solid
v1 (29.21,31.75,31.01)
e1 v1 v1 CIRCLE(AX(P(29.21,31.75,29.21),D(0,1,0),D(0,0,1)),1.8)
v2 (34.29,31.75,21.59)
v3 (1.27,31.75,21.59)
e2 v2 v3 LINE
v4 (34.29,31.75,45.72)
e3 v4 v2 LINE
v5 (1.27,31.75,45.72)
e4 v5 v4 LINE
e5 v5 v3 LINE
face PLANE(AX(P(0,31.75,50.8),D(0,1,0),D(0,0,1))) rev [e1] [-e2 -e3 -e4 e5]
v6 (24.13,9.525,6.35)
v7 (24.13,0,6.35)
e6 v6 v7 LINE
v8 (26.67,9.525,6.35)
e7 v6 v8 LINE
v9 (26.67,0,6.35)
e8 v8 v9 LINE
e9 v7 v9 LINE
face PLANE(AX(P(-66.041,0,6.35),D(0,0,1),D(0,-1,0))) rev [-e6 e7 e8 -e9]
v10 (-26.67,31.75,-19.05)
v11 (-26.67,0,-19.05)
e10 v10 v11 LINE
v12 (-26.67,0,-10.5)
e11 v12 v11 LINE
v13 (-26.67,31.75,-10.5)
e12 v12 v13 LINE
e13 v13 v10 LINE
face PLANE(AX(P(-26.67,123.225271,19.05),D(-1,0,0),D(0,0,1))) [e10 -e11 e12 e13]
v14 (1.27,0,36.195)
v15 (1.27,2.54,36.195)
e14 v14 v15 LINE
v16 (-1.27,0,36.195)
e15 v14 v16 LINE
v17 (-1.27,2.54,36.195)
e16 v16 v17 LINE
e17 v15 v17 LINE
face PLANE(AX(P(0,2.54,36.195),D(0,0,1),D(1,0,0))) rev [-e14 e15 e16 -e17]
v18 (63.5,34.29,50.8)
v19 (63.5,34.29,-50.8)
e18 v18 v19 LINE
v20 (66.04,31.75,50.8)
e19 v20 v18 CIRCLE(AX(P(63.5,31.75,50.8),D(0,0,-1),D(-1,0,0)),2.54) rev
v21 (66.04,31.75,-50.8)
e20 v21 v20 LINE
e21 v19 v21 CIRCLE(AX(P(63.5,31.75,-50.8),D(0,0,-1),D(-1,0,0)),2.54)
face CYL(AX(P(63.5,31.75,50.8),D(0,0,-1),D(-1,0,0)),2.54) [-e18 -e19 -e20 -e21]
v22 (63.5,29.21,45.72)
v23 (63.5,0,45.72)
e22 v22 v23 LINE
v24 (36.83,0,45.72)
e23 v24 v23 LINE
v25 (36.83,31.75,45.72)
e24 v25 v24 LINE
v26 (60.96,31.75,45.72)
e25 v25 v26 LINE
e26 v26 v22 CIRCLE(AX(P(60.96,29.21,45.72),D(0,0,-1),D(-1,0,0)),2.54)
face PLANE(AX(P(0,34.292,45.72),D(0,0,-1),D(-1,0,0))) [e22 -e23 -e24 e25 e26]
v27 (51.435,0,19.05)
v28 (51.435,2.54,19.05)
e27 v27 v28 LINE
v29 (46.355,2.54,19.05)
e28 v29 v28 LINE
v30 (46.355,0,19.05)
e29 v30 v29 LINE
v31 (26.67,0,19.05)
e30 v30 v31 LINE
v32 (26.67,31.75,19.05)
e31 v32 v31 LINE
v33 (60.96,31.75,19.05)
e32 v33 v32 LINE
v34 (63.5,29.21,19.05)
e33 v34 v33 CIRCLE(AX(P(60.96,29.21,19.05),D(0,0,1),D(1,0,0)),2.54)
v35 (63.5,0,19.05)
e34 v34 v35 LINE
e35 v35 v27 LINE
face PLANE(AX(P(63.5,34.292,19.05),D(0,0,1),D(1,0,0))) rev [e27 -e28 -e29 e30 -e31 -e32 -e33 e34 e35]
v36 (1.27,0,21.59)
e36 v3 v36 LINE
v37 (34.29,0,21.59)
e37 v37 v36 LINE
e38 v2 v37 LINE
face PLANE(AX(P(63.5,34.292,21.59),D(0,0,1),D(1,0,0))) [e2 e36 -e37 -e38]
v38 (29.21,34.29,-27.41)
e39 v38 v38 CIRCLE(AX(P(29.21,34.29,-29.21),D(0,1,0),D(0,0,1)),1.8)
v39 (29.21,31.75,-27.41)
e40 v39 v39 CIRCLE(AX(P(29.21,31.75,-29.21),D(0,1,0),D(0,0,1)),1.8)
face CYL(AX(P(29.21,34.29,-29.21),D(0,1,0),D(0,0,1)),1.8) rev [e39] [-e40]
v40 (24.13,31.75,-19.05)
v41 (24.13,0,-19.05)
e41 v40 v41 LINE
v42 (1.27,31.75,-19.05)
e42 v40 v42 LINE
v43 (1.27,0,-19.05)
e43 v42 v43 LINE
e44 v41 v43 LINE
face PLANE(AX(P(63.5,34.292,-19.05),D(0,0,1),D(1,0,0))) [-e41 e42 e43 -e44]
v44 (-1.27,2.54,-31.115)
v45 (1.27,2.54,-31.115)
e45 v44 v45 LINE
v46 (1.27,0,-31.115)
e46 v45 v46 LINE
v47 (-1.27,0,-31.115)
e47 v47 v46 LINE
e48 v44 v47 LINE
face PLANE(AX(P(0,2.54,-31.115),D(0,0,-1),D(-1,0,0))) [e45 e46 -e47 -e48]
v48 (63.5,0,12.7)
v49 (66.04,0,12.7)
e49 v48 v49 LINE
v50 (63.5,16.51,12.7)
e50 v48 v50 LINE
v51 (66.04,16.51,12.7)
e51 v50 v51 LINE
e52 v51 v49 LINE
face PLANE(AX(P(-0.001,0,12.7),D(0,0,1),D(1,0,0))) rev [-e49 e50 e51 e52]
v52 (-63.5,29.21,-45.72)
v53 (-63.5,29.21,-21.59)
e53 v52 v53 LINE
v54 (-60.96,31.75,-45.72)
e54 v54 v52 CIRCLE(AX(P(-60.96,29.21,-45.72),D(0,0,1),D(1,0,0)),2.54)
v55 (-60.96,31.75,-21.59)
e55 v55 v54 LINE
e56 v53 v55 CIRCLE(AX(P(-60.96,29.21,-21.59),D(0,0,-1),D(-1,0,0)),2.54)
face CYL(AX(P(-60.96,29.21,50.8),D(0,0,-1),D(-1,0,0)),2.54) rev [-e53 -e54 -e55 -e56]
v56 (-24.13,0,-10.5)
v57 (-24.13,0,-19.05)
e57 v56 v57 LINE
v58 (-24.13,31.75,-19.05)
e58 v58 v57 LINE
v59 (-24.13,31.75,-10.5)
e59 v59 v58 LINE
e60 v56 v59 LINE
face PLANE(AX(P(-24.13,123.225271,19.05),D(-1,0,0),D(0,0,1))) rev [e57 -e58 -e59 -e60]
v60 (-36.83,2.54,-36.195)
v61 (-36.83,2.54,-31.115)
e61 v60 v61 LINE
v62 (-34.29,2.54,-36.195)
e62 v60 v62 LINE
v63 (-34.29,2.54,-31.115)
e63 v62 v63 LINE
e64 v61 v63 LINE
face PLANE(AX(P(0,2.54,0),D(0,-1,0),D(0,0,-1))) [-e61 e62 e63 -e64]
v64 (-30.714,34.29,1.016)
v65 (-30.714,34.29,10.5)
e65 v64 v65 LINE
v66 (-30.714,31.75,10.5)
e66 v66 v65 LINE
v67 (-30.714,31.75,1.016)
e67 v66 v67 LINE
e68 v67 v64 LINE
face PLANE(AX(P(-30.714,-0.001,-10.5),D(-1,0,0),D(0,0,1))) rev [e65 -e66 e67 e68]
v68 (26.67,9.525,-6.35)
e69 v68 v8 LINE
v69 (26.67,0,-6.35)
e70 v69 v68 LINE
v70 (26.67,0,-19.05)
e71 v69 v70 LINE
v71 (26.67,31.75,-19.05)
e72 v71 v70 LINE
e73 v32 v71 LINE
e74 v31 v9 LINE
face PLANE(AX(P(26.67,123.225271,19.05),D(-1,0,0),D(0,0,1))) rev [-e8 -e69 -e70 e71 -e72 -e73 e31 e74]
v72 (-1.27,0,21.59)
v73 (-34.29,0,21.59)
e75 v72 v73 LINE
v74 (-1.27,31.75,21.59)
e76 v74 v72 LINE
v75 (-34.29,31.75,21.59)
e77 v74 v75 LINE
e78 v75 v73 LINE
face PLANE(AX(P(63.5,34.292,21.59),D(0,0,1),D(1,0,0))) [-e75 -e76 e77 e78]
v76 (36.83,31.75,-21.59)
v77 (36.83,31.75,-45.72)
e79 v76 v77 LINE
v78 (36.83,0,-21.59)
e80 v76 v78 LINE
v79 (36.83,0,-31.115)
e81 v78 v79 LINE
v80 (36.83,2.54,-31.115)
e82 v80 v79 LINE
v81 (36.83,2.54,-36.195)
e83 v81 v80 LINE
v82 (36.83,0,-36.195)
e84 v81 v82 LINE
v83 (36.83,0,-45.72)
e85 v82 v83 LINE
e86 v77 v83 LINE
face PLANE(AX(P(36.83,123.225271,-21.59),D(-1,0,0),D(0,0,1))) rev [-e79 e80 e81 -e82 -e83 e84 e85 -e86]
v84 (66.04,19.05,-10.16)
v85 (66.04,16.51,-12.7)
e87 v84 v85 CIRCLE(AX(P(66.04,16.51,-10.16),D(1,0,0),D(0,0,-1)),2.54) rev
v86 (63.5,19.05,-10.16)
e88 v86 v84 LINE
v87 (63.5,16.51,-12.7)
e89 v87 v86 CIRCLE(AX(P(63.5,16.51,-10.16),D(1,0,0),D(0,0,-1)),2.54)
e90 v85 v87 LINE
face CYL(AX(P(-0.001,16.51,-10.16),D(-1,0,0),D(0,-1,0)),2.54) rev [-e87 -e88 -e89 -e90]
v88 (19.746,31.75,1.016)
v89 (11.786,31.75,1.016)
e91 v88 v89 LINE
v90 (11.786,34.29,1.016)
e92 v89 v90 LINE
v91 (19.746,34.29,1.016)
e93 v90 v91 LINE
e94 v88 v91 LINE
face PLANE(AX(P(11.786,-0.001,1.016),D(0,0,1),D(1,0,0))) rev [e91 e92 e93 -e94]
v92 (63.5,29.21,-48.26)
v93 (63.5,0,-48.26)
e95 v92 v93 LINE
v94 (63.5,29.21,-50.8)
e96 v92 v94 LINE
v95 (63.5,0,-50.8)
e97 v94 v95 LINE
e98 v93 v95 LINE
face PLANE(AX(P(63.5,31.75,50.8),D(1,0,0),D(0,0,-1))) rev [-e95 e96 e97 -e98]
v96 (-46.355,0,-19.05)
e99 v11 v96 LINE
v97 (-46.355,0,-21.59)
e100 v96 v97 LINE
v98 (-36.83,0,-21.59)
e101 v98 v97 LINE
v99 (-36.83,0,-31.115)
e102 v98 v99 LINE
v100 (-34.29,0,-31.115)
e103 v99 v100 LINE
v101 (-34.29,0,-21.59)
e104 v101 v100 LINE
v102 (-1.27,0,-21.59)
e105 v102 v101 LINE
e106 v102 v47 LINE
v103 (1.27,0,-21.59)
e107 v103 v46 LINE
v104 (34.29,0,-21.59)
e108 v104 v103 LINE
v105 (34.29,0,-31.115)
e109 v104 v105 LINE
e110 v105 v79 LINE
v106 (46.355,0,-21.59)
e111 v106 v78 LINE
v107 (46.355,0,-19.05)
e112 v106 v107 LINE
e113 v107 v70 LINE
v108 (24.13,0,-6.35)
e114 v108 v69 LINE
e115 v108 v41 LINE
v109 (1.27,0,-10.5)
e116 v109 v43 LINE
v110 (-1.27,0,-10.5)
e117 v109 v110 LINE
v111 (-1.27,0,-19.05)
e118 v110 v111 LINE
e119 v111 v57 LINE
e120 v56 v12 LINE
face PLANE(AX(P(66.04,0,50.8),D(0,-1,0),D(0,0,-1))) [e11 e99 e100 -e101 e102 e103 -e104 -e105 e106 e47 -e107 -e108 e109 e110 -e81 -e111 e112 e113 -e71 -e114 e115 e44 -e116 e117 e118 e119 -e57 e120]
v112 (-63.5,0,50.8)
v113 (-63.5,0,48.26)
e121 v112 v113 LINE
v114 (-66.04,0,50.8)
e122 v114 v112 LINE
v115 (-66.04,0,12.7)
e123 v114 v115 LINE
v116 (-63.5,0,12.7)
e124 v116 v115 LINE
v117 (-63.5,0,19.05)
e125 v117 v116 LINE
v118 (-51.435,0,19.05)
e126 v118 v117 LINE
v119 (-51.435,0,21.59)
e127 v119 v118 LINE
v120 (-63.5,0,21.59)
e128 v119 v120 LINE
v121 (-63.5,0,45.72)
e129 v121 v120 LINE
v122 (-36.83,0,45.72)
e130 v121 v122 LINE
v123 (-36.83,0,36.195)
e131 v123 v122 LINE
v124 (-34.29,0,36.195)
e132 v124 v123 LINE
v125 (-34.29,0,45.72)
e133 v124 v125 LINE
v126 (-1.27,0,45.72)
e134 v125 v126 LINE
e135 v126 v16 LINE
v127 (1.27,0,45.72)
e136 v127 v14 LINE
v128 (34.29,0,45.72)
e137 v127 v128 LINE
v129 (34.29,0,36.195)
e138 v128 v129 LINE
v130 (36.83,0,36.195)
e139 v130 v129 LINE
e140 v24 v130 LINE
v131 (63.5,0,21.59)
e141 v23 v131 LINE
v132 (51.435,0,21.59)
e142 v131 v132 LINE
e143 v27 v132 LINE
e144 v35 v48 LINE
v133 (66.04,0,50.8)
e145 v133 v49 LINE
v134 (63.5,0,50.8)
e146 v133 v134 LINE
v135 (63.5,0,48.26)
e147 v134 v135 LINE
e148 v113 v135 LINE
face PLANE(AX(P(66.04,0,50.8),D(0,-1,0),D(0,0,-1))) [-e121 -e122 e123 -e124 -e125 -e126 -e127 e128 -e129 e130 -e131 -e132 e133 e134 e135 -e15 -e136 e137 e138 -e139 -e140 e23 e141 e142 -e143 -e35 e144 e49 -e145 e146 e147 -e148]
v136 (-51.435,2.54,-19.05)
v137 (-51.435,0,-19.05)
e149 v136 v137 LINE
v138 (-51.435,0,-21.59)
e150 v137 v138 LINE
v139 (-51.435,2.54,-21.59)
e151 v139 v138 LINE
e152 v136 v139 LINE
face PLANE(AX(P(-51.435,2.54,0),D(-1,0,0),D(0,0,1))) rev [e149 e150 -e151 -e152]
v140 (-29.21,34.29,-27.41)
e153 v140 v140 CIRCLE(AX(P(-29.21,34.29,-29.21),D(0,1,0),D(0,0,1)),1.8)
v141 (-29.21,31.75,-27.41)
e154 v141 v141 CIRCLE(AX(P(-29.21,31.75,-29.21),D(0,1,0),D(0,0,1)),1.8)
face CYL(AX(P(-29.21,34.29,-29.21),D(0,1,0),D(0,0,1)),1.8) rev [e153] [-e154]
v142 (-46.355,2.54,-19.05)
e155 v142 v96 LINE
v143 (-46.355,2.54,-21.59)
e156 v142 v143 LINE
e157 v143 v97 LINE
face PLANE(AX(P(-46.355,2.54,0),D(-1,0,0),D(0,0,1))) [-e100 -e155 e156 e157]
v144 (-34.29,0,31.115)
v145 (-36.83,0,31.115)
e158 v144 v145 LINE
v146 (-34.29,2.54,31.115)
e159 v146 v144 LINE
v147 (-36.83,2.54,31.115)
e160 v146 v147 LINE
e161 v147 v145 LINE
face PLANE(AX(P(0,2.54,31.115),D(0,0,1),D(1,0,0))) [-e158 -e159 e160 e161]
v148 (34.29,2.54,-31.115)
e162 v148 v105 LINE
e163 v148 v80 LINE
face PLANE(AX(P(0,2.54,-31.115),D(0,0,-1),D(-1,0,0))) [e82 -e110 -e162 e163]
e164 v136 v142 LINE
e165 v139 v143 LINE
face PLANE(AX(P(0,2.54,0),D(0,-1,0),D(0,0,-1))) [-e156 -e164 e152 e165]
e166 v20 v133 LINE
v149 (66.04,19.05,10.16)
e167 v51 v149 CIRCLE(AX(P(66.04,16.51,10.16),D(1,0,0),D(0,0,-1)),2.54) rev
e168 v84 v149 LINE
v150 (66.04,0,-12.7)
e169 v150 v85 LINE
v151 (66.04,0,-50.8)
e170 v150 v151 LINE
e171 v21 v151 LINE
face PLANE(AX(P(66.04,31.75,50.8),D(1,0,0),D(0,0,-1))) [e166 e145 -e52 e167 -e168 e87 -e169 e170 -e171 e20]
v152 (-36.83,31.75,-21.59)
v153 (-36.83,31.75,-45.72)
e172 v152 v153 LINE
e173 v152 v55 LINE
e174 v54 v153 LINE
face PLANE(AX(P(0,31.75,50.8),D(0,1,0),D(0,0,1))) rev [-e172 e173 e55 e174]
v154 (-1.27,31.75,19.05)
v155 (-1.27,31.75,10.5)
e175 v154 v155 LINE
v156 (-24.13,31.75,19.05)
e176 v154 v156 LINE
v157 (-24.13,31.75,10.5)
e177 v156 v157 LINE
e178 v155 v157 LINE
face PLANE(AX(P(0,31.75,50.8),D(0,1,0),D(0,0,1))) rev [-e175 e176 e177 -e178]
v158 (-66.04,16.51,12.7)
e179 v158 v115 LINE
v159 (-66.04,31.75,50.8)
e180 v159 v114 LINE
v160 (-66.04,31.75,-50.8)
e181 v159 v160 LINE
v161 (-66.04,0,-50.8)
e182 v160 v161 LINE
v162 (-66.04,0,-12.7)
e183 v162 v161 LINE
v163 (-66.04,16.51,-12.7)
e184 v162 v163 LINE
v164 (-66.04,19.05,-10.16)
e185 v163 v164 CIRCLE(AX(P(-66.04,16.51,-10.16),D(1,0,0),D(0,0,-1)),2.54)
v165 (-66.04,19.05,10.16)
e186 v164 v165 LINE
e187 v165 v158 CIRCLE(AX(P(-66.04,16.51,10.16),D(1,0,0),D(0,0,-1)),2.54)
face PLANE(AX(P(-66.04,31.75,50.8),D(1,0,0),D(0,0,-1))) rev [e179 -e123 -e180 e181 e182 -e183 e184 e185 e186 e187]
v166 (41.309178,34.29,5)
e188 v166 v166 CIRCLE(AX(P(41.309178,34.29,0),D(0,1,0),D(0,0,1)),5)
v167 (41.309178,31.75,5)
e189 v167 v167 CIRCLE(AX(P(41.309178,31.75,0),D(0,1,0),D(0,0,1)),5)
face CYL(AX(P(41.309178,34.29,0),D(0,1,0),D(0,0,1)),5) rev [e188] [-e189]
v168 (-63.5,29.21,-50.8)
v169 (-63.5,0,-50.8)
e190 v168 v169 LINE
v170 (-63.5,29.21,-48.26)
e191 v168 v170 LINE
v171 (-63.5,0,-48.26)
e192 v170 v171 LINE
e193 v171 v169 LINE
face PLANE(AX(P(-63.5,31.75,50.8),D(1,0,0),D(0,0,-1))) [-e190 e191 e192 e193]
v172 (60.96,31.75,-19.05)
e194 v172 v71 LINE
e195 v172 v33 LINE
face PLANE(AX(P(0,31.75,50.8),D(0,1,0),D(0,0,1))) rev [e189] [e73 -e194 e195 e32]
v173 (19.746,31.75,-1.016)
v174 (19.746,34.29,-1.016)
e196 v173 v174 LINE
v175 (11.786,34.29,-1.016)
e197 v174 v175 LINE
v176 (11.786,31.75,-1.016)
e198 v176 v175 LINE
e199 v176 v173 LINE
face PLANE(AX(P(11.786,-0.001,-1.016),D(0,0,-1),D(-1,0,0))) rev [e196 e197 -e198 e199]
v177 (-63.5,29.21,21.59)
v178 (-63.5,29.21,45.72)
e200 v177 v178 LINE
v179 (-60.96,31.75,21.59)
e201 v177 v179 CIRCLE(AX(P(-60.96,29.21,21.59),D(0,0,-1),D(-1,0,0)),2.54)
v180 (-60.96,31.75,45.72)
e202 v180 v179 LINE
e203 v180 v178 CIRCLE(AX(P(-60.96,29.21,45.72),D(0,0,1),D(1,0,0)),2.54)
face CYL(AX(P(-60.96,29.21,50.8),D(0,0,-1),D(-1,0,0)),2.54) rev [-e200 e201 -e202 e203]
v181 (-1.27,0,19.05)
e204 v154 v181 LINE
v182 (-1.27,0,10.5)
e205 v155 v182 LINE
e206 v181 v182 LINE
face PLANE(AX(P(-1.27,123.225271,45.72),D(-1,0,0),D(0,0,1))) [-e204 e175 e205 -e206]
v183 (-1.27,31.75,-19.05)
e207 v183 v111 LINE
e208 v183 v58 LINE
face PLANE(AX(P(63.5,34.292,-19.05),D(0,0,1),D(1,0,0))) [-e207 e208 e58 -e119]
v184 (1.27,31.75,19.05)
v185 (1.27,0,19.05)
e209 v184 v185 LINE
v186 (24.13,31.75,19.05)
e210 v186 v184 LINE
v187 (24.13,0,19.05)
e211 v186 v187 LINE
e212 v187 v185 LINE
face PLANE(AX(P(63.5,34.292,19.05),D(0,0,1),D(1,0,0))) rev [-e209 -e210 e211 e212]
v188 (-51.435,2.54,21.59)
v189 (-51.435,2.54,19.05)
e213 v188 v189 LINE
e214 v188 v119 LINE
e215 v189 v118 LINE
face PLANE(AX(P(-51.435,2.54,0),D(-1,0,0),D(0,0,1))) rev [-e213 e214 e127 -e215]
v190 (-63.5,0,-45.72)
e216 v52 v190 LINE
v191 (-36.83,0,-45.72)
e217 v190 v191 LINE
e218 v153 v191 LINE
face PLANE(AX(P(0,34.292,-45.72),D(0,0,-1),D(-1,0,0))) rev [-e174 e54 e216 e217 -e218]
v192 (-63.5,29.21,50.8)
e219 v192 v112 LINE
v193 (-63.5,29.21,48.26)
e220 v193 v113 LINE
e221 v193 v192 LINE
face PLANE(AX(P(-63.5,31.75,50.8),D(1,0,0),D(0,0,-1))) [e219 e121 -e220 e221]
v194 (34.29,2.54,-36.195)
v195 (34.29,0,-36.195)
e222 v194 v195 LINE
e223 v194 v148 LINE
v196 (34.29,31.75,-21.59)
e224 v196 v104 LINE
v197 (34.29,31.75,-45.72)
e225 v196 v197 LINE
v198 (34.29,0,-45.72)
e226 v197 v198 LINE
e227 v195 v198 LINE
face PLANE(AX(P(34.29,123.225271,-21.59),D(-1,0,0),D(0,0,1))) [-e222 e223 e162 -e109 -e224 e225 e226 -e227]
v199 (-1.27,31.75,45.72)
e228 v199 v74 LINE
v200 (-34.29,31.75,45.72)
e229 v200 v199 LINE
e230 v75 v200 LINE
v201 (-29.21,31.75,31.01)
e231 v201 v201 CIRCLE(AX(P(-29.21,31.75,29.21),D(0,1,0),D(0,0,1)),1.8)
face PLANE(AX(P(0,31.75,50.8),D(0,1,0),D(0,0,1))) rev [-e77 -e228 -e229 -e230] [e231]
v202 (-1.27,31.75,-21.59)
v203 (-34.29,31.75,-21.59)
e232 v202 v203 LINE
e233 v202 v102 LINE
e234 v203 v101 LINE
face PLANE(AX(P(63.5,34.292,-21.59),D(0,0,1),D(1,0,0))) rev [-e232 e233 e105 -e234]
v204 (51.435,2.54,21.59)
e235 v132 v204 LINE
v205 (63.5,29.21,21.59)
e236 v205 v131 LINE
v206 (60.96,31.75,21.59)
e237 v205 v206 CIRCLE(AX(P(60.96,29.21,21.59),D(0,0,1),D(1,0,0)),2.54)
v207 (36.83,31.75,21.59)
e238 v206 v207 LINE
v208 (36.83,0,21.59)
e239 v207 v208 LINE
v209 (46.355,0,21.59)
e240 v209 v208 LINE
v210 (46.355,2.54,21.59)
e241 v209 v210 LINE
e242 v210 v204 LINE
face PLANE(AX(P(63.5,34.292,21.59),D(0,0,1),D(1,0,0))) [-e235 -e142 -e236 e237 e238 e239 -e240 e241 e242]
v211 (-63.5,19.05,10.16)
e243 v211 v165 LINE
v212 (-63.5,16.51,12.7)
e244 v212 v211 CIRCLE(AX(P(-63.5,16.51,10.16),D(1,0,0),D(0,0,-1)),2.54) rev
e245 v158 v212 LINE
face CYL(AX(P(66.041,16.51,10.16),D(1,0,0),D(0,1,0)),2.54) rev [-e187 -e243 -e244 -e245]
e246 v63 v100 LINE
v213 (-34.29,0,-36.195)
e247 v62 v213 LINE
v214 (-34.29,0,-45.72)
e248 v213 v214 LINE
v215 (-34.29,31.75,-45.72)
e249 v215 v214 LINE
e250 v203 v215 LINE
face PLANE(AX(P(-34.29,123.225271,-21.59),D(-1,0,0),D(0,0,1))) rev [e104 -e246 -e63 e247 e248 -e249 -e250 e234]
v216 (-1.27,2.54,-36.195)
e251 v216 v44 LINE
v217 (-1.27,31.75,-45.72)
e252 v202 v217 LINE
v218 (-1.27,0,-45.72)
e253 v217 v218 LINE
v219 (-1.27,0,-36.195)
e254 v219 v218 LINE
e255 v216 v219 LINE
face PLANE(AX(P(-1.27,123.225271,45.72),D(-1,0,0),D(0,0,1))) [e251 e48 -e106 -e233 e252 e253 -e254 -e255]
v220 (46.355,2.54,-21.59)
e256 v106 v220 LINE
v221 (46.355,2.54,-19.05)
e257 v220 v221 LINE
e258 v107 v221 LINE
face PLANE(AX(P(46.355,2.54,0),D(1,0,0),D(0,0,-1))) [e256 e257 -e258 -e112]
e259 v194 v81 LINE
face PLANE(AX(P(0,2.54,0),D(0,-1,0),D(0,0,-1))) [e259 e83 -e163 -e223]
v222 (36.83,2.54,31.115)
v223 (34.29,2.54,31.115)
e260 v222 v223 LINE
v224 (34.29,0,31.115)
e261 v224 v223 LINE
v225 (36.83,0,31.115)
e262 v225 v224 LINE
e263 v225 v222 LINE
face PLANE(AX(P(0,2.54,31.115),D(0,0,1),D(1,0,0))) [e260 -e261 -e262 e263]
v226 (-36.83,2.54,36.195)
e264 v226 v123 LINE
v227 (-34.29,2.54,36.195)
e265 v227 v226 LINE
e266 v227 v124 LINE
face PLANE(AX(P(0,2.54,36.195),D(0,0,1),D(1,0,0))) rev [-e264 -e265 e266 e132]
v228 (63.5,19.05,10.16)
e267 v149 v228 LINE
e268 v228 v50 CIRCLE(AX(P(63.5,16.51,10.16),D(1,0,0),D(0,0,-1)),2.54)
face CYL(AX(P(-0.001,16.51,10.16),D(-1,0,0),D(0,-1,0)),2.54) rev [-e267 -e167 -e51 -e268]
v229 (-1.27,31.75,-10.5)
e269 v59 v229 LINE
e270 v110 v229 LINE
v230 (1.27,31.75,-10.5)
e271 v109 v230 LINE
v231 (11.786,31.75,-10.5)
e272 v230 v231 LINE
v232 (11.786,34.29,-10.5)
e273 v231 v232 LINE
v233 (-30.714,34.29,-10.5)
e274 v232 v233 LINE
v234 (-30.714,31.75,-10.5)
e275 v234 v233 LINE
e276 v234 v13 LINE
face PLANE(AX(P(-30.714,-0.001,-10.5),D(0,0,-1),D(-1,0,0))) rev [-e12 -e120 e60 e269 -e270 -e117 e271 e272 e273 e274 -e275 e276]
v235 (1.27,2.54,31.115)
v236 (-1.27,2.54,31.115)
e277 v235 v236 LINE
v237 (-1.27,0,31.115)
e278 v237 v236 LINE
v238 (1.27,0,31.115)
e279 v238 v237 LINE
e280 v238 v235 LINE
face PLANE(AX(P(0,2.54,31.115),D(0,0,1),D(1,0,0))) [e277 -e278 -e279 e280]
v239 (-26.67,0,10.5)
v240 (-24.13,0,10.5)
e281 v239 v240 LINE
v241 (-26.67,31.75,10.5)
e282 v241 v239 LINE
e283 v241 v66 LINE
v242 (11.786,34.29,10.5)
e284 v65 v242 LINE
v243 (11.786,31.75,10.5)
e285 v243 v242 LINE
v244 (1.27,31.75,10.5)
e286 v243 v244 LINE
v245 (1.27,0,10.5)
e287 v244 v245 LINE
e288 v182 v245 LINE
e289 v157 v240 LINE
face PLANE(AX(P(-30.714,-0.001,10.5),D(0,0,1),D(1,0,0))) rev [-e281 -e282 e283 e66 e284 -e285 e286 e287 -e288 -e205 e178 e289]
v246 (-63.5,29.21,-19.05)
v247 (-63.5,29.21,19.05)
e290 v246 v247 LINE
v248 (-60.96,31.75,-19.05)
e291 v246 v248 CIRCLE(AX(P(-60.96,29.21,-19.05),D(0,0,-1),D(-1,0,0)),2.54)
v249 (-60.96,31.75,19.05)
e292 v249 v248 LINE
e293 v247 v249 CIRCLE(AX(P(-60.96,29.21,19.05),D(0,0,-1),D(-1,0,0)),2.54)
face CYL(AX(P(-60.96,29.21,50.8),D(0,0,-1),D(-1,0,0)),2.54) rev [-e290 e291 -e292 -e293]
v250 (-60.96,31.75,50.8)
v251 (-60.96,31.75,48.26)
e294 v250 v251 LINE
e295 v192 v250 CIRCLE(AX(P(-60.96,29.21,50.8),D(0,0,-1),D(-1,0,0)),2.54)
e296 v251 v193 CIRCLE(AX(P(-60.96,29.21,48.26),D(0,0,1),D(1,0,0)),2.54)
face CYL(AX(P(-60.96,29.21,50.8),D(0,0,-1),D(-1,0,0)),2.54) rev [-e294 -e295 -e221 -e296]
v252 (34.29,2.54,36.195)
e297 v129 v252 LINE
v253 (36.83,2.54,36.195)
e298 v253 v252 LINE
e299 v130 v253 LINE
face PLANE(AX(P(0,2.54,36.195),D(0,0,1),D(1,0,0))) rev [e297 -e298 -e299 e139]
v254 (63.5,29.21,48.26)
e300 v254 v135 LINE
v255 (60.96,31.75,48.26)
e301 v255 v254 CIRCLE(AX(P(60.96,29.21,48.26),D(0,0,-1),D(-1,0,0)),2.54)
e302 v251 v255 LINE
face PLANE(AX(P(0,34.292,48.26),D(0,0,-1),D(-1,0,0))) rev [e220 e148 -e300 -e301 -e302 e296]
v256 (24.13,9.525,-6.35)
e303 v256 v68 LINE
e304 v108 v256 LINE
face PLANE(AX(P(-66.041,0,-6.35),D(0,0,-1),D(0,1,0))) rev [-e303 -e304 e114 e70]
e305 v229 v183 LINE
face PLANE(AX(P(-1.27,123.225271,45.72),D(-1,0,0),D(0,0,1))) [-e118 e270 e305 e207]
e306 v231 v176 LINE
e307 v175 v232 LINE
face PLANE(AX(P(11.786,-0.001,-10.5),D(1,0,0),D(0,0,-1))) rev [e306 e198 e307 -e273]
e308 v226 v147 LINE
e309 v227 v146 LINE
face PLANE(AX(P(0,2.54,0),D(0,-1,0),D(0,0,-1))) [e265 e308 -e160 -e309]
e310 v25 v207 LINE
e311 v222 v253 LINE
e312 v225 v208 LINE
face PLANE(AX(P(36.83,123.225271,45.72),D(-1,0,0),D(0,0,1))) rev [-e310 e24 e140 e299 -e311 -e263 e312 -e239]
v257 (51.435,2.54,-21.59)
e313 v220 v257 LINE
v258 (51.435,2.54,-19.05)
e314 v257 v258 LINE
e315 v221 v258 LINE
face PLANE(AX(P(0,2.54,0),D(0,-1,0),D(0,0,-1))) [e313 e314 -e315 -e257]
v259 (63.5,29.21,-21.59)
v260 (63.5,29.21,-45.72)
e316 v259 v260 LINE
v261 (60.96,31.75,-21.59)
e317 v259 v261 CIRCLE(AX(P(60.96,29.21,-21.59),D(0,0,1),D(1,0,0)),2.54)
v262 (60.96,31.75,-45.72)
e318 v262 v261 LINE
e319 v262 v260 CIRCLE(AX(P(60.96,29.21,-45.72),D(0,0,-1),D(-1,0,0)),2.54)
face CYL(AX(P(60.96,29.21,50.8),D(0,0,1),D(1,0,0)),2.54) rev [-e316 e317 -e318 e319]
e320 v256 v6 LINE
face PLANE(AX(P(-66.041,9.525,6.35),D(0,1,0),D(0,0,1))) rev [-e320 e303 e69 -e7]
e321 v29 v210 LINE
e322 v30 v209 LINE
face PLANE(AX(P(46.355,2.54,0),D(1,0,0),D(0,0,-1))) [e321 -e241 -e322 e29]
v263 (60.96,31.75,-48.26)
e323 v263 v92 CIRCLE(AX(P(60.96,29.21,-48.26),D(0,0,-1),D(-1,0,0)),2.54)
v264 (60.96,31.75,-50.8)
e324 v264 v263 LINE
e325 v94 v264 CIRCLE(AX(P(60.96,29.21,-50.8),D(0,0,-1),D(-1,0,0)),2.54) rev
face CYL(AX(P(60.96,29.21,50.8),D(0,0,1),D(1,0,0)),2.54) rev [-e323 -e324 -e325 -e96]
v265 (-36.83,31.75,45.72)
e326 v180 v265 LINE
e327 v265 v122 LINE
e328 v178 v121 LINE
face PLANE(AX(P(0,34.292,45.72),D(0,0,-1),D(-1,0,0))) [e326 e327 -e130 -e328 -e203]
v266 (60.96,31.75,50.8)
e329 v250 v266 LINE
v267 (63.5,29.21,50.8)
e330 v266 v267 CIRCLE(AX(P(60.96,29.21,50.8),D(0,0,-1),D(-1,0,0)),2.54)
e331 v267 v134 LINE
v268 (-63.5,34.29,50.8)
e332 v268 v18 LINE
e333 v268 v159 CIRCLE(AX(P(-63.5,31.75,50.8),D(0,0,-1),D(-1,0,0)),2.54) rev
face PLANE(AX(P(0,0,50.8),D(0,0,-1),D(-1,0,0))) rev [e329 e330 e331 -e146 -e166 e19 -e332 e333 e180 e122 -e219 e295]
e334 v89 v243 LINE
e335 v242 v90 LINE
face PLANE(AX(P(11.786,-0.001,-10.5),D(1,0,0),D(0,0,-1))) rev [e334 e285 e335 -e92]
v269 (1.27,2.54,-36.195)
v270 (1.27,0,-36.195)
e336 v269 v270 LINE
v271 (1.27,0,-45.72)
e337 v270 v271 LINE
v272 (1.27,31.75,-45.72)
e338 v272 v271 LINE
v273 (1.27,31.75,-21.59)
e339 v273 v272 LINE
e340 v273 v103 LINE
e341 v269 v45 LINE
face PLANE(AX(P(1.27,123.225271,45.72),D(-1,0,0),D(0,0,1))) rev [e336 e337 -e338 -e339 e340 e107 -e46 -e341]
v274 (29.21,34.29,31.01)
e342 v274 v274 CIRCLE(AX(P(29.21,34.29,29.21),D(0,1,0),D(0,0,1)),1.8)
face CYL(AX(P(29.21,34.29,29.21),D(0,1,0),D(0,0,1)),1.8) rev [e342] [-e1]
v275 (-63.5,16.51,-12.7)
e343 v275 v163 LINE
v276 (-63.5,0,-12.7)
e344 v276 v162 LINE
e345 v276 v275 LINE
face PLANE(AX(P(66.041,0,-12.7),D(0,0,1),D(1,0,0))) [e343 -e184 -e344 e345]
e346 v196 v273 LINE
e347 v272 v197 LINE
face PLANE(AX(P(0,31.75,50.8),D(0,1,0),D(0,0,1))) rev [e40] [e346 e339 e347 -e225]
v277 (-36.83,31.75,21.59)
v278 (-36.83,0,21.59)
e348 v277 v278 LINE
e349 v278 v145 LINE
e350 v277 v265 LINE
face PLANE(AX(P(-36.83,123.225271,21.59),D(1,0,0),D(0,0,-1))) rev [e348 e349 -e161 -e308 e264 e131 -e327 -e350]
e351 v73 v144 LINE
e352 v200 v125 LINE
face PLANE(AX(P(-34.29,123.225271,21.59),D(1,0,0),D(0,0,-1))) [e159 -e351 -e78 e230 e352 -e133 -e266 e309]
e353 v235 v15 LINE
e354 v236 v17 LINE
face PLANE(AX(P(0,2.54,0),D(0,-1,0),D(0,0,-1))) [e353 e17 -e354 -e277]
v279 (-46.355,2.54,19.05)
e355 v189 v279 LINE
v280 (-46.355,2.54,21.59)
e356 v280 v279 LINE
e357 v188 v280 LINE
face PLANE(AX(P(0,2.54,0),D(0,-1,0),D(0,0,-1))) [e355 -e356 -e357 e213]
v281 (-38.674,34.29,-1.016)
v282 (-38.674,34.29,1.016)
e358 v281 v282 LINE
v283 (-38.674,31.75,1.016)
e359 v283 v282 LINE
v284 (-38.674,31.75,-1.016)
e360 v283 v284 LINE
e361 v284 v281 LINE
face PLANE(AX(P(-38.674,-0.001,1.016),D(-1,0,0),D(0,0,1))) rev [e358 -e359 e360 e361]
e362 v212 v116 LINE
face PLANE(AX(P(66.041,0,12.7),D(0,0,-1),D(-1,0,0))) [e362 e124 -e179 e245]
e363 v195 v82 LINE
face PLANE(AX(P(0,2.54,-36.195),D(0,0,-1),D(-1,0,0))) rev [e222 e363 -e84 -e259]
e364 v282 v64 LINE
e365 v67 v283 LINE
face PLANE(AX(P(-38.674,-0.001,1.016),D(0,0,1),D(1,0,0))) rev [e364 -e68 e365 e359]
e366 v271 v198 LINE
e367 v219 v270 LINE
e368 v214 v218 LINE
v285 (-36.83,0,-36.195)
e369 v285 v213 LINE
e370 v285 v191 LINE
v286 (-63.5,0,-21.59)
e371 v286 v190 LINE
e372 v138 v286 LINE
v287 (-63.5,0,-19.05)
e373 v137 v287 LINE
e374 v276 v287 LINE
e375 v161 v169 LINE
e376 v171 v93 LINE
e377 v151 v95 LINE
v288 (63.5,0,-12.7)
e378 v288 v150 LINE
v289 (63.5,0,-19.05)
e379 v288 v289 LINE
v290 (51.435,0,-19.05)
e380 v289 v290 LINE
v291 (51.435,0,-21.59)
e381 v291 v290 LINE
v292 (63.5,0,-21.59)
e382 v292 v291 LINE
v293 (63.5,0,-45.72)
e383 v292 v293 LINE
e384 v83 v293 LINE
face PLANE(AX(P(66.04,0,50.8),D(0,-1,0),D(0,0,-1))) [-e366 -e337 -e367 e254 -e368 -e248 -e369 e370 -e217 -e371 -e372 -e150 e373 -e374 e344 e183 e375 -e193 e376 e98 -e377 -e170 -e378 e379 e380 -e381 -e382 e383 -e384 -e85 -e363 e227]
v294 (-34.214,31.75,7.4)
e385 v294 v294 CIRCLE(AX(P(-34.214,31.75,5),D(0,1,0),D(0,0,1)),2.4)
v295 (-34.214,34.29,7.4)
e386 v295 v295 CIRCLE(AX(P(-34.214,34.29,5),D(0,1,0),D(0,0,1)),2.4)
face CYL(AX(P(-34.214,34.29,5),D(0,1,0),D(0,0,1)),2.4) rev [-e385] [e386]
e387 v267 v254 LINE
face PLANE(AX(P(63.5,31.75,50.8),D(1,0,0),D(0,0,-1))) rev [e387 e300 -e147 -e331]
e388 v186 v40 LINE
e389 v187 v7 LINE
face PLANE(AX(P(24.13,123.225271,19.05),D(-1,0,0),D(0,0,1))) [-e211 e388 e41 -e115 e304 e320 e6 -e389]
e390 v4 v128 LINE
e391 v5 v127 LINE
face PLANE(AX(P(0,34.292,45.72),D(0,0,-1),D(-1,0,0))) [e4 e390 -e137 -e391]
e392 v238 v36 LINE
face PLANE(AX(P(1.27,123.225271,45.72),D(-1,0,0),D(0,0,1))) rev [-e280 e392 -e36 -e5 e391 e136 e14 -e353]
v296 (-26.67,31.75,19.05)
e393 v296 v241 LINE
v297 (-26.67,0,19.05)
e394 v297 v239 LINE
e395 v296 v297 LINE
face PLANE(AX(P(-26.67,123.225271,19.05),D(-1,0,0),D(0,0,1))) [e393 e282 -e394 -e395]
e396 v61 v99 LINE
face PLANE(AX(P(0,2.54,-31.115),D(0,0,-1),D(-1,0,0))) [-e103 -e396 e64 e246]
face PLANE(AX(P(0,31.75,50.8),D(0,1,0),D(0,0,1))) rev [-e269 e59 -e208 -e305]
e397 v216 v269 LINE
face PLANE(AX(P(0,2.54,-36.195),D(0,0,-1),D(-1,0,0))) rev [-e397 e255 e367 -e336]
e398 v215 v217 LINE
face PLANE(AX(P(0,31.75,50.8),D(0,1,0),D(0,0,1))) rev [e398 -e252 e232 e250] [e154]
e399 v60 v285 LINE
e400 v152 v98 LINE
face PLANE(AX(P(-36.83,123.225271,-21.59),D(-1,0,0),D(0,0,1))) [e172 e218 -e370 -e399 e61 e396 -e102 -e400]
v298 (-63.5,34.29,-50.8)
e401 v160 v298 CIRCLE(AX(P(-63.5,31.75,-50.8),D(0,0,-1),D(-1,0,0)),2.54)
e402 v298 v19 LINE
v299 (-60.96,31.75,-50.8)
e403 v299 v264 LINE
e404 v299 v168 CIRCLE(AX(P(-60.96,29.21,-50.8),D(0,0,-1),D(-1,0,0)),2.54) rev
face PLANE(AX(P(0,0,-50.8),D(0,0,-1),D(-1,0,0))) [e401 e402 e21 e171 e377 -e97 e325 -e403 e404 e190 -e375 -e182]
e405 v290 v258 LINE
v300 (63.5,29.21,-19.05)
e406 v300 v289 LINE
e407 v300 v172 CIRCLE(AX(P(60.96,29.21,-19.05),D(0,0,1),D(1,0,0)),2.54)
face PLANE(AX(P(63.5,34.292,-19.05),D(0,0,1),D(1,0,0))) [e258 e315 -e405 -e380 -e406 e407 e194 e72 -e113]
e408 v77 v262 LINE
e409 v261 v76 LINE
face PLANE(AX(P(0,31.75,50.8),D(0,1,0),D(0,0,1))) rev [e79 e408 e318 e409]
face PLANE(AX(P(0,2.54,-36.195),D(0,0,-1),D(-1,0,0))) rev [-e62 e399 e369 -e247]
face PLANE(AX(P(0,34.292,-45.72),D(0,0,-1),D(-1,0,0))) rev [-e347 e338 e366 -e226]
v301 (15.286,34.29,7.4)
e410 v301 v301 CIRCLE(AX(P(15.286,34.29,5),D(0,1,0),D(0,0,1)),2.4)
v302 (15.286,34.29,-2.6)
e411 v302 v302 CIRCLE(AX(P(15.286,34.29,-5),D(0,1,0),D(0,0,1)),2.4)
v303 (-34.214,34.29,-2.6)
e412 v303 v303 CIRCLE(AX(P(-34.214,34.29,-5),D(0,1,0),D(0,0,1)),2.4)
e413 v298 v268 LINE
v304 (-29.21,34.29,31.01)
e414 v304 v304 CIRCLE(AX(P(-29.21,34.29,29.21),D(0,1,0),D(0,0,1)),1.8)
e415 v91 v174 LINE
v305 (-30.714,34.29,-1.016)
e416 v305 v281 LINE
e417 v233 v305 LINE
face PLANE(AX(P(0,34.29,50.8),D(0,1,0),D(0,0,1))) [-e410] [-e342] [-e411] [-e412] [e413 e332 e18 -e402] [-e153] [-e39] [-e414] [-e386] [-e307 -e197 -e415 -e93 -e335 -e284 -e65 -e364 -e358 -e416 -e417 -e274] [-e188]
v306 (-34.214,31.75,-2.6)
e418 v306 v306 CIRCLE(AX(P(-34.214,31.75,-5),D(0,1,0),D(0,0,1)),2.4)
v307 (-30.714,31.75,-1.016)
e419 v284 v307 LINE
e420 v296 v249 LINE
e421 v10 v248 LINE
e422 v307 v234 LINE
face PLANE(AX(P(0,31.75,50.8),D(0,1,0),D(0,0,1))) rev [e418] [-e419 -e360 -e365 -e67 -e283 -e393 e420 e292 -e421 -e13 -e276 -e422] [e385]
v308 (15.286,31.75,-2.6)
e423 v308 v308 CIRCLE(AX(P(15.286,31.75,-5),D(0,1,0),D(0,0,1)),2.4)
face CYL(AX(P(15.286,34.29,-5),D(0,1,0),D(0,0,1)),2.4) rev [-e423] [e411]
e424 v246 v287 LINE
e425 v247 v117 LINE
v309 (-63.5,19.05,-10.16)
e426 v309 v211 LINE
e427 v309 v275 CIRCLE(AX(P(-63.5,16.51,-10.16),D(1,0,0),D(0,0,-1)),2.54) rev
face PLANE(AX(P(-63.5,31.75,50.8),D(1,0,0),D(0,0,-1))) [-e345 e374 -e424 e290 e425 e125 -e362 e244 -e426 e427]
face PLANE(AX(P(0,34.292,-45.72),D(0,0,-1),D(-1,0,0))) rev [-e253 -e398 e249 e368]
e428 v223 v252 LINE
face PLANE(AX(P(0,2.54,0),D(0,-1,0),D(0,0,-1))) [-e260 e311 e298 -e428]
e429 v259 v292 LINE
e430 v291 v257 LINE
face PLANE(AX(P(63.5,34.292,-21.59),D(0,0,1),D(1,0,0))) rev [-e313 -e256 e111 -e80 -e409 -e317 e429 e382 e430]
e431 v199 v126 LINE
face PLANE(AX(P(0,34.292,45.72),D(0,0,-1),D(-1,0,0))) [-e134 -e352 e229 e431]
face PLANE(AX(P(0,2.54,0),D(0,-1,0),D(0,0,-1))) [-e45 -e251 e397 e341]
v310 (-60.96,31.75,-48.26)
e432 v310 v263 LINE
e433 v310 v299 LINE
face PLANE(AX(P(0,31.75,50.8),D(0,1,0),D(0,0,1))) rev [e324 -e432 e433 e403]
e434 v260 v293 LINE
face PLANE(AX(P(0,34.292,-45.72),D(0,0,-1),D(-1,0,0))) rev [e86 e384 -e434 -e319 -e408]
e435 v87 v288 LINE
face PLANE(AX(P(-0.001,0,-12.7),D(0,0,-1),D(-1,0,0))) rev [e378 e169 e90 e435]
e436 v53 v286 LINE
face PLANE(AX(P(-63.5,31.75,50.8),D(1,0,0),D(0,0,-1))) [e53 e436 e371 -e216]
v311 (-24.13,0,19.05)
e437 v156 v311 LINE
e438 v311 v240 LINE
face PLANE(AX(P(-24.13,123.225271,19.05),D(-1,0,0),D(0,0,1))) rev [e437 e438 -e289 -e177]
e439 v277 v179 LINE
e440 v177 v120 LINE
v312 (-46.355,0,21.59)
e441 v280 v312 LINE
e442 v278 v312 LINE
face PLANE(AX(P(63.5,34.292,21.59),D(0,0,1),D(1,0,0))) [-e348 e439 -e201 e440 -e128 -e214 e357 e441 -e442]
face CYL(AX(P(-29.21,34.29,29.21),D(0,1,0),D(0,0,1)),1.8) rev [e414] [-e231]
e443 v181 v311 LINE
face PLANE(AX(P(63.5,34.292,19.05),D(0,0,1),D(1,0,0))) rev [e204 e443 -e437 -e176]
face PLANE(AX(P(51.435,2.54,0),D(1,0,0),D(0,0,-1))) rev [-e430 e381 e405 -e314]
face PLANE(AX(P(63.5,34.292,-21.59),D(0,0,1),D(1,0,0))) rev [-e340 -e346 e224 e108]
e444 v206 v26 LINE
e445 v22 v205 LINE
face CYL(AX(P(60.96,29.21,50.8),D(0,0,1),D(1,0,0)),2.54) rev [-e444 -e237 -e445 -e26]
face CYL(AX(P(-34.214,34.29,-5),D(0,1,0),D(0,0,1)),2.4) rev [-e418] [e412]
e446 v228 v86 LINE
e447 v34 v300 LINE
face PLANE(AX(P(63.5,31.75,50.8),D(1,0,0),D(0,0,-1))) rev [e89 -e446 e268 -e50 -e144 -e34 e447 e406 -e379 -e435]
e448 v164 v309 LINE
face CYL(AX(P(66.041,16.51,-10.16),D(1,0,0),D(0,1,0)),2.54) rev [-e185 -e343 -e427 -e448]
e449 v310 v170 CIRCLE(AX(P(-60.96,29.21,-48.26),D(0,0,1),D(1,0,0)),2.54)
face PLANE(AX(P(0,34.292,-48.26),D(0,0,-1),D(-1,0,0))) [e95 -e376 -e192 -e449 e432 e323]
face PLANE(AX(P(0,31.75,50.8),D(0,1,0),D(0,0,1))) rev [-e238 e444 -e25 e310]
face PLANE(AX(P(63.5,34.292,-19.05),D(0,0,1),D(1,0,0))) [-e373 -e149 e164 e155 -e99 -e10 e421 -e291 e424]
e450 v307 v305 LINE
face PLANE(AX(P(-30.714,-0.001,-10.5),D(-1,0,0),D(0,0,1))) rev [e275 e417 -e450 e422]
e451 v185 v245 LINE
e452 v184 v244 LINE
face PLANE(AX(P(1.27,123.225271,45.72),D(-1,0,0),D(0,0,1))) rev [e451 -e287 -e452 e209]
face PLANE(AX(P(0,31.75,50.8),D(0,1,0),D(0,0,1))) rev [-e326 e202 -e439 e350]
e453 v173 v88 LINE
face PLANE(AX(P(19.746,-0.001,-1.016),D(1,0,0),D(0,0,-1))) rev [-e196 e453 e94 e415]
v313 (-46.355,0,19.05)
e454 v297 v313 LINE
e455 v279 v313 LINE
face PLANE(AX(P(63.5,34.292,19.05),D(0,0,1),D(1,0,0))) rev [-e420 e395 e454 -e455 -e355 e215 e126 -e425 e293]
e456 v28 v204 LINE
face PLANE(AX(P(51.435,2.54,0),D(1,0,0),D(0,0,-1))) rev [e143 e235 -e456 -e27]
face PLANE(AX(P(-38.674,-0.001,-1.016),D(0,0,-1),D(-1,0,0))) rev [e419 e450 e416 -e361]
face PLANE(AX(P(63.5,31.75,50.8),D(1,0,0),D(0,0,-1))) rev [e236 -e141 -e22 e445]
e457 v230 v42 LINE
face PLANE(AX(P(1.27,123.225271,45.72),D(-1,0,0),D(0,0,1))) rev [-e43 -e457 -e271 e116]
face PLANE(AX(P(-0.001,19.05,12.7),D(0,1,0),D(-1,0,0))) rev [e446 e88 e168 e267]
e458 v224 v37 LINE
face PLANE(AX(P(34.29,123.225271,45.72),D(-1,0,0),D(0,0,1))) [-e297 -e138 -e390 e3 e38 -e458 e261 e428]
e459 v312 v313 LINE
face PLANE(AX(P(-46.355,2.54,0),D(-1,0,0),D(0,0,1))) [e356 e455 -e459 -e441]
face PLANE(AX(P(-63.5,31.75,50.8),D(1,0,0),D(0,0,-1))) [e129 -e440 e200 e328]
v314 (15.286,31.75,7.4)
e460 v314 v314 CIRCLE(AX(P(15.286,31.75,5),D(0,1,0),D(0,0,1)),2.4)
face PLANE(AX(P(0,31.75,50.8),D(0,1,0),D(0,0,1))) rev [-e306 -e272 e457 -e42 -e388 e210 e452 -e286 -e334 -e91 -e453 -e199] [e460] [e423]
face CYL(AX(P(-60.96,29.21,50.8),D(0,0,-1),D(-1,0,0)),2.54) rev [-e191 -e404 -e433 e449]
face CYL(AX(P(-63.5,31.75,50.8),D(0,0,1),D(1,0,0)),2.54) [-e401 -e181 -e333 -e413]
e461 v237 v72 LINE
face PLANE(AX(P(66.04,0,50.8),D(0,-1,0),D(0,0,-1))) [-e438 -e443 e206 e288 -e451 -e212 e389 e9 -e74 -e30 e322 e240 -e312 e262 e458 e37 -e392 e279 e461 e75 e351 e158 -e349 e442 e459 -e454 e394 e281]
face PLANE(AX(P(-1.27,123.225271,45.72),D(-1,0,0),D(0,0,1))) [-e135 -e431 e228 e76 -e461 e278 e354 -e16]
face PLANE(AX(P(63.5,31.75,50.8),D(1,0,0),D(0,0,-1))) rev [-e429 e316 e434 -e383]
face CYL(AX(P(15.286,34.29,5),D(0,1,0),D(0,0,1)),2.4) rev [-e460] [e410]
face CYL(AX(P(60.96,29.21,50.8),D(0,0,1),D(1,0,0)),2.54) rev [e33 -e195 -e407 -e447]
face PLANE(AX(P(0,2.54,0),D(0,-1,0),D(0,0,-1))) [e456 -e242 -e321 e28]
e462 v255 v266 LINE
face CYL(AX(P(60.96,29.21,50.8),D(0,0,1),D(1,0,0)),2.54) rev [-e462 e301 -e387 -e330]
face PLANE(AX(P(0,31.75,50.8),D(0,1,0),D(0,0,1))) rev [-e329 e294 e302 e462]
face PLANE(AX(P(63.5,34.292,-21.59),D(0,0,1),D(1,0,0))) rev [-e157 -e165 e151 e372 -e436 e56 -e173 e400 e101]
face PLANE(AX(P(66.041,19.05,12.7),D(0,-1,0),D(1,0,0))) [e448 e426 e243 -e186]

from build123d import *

# Parameters (mm, degrees)
EXTRUDE_THIN1_DEPTH     = 50.8
CUT_EXTRUDE1_REACH      = 92.098
SKETCH4_W               = 25.4
SKETCH4_H               = 19.05
FILLET1_R               = 2.54
EXTRUDE_THIN2_REACH     = 92.098
SKETCH3_W               = 63.5
SKETCH3_H               = 2.54
SKETCH9_W               = 2.54
SKETCH9_H               = 38.1
SKETCH9_H_2             = 91.44
SKETCH9_H_3             = 24.13
EXTRUDE_THIN3_DEPTH     = 31.75
CUT_EXTRUDE2_REACH      = 92.098
SKETCH5_W               = 42.5
SKETCH5_H               = 21
M4_CLEARANCE_HOLE1_D    = 4.8
CUT_EXTRUDE4_REACH      = 92.098
SKETCH7_W               = 7.96
SKETCH7_H               = 2.032
CUT_EXTRUDE5_REACH      = 113.138
SKETCH10_W              = 12.7
SKETCH10_H              = 9.525
M3_CLEARANCE_HOLE1_D    = 3.6
M8_CLEARANCE_HOLE1_D    = 10
SKETCH19_W              = 102.87
SKETCH19_H              = 72.39
SKETCH19_W_2            = 92.71
SKETCH19_H_2            = 62.23
CUT_EXTRUDE_THIN1_DEPTH = 2.54


# Read off the part's stored shape, not the designer's step: Mirror2
with BuildPart() as part:
    # Sketch2 → Extrude-Thin1 (new, symmetric)
    with BuildSketch(Plane.XY):
        Polygon((0, 31.75), (63.5, 31.75), (63.5, 0), (66.04, 0), (66.04, 34.29), (0, 34.29), align=None)
    extrude(amount=EXTRUDE_THIN1_DEPTH, both=True)

    # Sketch4 → Cut-Extrude1 (cut, up to next)
    with BuildSketch(Plane(origin=(66.04, 0, 0), x_dir=(0, 0, -1), z_dir=(1, 0, 0)), mode=Mode.PRIVATE) as cut_extrude1_sk1:
        with Locations((0, 9.525)):
            Rectangle(SKETCH4_W, SKETCH4_H)
    cut_extrude1_tool1 = extrude(cut_extrude1_sk1.sketch, amount=-CUT_EXTRUDE1_REACH, mode=Mode.PRIVATE) & part.part
    add(cut_extrude1_tool1.solids().sort_by_distance((66.04, 9.525, 0))[0], mode=Mode.SUBTRACT)

    # Fillet1
    fillet1_edges = [part.edges().sort_by_distance(p)[0] for p in [
        (64.77, 19.05, 12.7),
        (64.77, 19.05, -12.7),
        (63.5, 31.75, 0),
        (66.04, 34.29, 0),
    ]]
    fillet(fillet1_edges, radius=FILLET1_R)

    # Sketch3 → Extrude-Thin2 (add, up to next)
    with BuildSketch(Plane.XZ, mode=Mode.PRIVATE) as extrude_thin2_sk1:
        with Locations((31.75, 20.32)):
            Rectangle(SKETCH3_W, SKETCH3_H)
    extrude_thin2_tool1 = extrude(extrude_thin2_sk1.sketch, amount=-EXTRUDE_THIN2_REACH, mode=Mode.PRIVATE) - part.part
    # Sketch3 → Extrude-Thin2 (add, up to next)
    with BuildSketch(Plane.XZ, mode=Mode.PRIVATE) as extrude_thin2_sk2:
        with Locations((31.75, 46.99)):
            Rectangle(SKETCH3_W, SKETCH3_H)
    extrude_thin2_tool2 = extrude(extrude_thin2_sk2.sketch, amount=-EXTRUDE_THIN2_REACH, mode=Mode.PRIVATE) - part.part
    extrude_thin2_1 = extrude_thin2_tool1.solids().sort_by_distance((31.75, 0, 20.32))[0]
    add(extrude_thin2_1)
    extrude_thin2_2 = extrude_thin2_tool2.solids().sort_by_distance((31.75, 0, 46.99))[0]
    add(extrude_thin2_2)
    extrude_thin2 = extrude_thin2_1 + extrude_thin2_2  # Extrude-Thin2 as one shape, for the pattern or mirror that repeats it

    # Mirror1: Extrude-Thin2 across plane
    add(extrude_thin2.mirror(Plane.XY))

    # Mirror2: part across plane


with BuildPart() as part_1:
    add(part.part)
    add(part.part.mirror(Plane(origin=(0, 0, 0), x_dir=(0, 0, 1), z_dir=(1, 0, 0))))

    # Sketch9 → Extrude-Thin3 (add)
    with BuildSketch(Plane.XZ):
        with Locations((-25.4, 0)):
            Rectangle(SKETCH9_W, SKETCH9_H)
        Rectangle(SKETCH9_W, SKETCH9_H_2)
        with Locations((25.4, 0)):
            Rectangle(SKETCH9_W, SKETCH9_H)
        with Locations((-35.56, 33.655)):
            Rectangle(SKETCH9_W, SKETCH9_H_3)
        with Locations((-35.56, -33.655)):
            Rectangle(SKETCH9_W, SKETCH9_H_3)
        with Locations((35.56, 33.655)):
            Rectangle(SKETCH9_W, SKETCH9_H_3)
        with Locations((35.56, -33.655)):
            Rectangle(SKETCH9_W, SKETCH9_H_3)
    extrude(amount=-EXTRUDE_THIN3_DEPTH)

    # Sketch5 → Cut-Extrude2 (cut, up to next)
    with BuildSketch(Plane(origin=(0, 34.29, 0), x_dir=(1, 0, 0), z_dir=(0, 1, 0)), mode=Mode.PRIVATE) as cut_extrude2_sk1:
        with Locations((-9.464, 0)):
            Rectangle(SKETCH5_W, SKETCH5_H)
    cut_extrude2_tool1 = extrude(cut_extrude2_sk1.sketch, amount=-CUT_EXTRUDE2_REACH, mode=Mode.PRIVATE) & part_1.part
    add(cut_extrude2_tool1.solids().sort_by_distance((-9.464, 34.29, 0))[0], mode=Mode.SUBTRACT)

    # M4 Clearance Hole1 (through all)
    with Locations(Plane(origin=(0, 34.29, 0), x_dir=(1, 0, 0), z_dir=(0, 1, 0))):
        with Locations((15.286, -5), (15.286, 5), (-34.214, 5), (-34.214, -5)):
            Hole(M4_CLEARANCE_HOLE1_D / 2)

    # Sketch7 → Cut-Extrude4 (cut, up to next)
    with BuildSketch(Plane(origin=(0, 34.29, 0), x_dir=(1, 0, 0), z_dir=(0, 1, 0)), mode=Mode.PRIVATE) as cut_extrude4_sk1:
        with Locations((15.766, 0)):
            Rectangle(SKETCH7_W, SKETCH7_H)
    cut_extrude4_tool1 = extrude(cut_extrude4_sk1.sketch, amount=-CUT_EXTRUDE4_REACH, mode=Mode.PRIVATE) & part_1.part
    # Sketch7 → Cut-Extrude4 (cut, up to next)
    with BuildSketch(Plane(origin=(0, 34.29, 0), x_dir=(1, 0, 0), z_dir=(0, 1, 0)), mode=Mode.PRIVATE) as cut_extrude4_sk2:
        with Locations((-34.694, 0)):
            Rectangle(SKETCH7_W, SKETCH7_H)
    cut_extrude4_tool2 = extrude(cut_extrude4_sk2.sketch, amount=-CUT_EXTRUDE4_REACH, mode=Mode.PRIVATE) & part_1.part
    add(cut_extrude4_tool1.solids().sort_by_distance((15.766, 34.29, 0))[0], mode=Mode.SUBTRACT)
    add(cut_extrude4_tool2.solids().sort_by_distance((-34.694, 34.29, 0))[0], mode=Mode.SUBTRACT)

    # Sketch10 → Cut-Extrude5 (cut, up to next)
    with BuildSketch(Plane(origin=(26.67, 0, 0), x_dir=(0, 0, -1), z_dir=(1, 0, 0)), mode=Mode.PRIVATE) as cut_extrude5_sk1:
        with Locations((0, 4.7625)):
            Rectangle(SKETCH10_W, SKETCH10_H)
    cut_extrude5_tool1 = extrude(cut_extrude5_sk1.sketch, amount=-CUT_EXTRUDE5_REACH, mode=Mode.PRIVATE) & part_1.part
    add(cut_extrude5_tool1.solids().sort_by_distance((26.67, 4.7625, 0))[0], mode=Mode.SUBTRACT)

    # M3 Clearance Hole1 (through all)
    with Locations(Plane(origin=(0, 34.29, 0), x_dir=(1, 0, 0), z_dir=(0, 1, 0))):
        with Locations((-29.21, 29.21), (29.21, 29.21), (29.21, -29.21), (-29.21, -29.21)):
            Hole(M3_CLEARANCE_HOLE1_D / 2)

    # M8 Clearance Hole1 (through all)
    with Locations(Plane(origin=(0, 34.29, 0), x_dir=(1, 0, 0), z_dir=(0, 1, 0))):
        with Locations((41.309178157, 0)):
            Hole(M8_CLEARANCE_HOLE1_D / 2)

    # Sketch19 → Cut-Extrude-Thin1 (cut)
    with BuildSketch(Plane(origin=(0, 0, 0), x_dir=(-1, 0, 0), z_dir=(0, -1, 0))):
        Rectangle(SKETCH19_W, SKETCH19_H)
        Rectangle(SKETCH19_W_2, SKETCH19_H_2, mode=Mode.SUBTRACT)
    extrude(amount=-CUT_EXTRUDE_THIN1_DEPTH, mode=Mode.SUBTRACT)


solid = part_1.part
